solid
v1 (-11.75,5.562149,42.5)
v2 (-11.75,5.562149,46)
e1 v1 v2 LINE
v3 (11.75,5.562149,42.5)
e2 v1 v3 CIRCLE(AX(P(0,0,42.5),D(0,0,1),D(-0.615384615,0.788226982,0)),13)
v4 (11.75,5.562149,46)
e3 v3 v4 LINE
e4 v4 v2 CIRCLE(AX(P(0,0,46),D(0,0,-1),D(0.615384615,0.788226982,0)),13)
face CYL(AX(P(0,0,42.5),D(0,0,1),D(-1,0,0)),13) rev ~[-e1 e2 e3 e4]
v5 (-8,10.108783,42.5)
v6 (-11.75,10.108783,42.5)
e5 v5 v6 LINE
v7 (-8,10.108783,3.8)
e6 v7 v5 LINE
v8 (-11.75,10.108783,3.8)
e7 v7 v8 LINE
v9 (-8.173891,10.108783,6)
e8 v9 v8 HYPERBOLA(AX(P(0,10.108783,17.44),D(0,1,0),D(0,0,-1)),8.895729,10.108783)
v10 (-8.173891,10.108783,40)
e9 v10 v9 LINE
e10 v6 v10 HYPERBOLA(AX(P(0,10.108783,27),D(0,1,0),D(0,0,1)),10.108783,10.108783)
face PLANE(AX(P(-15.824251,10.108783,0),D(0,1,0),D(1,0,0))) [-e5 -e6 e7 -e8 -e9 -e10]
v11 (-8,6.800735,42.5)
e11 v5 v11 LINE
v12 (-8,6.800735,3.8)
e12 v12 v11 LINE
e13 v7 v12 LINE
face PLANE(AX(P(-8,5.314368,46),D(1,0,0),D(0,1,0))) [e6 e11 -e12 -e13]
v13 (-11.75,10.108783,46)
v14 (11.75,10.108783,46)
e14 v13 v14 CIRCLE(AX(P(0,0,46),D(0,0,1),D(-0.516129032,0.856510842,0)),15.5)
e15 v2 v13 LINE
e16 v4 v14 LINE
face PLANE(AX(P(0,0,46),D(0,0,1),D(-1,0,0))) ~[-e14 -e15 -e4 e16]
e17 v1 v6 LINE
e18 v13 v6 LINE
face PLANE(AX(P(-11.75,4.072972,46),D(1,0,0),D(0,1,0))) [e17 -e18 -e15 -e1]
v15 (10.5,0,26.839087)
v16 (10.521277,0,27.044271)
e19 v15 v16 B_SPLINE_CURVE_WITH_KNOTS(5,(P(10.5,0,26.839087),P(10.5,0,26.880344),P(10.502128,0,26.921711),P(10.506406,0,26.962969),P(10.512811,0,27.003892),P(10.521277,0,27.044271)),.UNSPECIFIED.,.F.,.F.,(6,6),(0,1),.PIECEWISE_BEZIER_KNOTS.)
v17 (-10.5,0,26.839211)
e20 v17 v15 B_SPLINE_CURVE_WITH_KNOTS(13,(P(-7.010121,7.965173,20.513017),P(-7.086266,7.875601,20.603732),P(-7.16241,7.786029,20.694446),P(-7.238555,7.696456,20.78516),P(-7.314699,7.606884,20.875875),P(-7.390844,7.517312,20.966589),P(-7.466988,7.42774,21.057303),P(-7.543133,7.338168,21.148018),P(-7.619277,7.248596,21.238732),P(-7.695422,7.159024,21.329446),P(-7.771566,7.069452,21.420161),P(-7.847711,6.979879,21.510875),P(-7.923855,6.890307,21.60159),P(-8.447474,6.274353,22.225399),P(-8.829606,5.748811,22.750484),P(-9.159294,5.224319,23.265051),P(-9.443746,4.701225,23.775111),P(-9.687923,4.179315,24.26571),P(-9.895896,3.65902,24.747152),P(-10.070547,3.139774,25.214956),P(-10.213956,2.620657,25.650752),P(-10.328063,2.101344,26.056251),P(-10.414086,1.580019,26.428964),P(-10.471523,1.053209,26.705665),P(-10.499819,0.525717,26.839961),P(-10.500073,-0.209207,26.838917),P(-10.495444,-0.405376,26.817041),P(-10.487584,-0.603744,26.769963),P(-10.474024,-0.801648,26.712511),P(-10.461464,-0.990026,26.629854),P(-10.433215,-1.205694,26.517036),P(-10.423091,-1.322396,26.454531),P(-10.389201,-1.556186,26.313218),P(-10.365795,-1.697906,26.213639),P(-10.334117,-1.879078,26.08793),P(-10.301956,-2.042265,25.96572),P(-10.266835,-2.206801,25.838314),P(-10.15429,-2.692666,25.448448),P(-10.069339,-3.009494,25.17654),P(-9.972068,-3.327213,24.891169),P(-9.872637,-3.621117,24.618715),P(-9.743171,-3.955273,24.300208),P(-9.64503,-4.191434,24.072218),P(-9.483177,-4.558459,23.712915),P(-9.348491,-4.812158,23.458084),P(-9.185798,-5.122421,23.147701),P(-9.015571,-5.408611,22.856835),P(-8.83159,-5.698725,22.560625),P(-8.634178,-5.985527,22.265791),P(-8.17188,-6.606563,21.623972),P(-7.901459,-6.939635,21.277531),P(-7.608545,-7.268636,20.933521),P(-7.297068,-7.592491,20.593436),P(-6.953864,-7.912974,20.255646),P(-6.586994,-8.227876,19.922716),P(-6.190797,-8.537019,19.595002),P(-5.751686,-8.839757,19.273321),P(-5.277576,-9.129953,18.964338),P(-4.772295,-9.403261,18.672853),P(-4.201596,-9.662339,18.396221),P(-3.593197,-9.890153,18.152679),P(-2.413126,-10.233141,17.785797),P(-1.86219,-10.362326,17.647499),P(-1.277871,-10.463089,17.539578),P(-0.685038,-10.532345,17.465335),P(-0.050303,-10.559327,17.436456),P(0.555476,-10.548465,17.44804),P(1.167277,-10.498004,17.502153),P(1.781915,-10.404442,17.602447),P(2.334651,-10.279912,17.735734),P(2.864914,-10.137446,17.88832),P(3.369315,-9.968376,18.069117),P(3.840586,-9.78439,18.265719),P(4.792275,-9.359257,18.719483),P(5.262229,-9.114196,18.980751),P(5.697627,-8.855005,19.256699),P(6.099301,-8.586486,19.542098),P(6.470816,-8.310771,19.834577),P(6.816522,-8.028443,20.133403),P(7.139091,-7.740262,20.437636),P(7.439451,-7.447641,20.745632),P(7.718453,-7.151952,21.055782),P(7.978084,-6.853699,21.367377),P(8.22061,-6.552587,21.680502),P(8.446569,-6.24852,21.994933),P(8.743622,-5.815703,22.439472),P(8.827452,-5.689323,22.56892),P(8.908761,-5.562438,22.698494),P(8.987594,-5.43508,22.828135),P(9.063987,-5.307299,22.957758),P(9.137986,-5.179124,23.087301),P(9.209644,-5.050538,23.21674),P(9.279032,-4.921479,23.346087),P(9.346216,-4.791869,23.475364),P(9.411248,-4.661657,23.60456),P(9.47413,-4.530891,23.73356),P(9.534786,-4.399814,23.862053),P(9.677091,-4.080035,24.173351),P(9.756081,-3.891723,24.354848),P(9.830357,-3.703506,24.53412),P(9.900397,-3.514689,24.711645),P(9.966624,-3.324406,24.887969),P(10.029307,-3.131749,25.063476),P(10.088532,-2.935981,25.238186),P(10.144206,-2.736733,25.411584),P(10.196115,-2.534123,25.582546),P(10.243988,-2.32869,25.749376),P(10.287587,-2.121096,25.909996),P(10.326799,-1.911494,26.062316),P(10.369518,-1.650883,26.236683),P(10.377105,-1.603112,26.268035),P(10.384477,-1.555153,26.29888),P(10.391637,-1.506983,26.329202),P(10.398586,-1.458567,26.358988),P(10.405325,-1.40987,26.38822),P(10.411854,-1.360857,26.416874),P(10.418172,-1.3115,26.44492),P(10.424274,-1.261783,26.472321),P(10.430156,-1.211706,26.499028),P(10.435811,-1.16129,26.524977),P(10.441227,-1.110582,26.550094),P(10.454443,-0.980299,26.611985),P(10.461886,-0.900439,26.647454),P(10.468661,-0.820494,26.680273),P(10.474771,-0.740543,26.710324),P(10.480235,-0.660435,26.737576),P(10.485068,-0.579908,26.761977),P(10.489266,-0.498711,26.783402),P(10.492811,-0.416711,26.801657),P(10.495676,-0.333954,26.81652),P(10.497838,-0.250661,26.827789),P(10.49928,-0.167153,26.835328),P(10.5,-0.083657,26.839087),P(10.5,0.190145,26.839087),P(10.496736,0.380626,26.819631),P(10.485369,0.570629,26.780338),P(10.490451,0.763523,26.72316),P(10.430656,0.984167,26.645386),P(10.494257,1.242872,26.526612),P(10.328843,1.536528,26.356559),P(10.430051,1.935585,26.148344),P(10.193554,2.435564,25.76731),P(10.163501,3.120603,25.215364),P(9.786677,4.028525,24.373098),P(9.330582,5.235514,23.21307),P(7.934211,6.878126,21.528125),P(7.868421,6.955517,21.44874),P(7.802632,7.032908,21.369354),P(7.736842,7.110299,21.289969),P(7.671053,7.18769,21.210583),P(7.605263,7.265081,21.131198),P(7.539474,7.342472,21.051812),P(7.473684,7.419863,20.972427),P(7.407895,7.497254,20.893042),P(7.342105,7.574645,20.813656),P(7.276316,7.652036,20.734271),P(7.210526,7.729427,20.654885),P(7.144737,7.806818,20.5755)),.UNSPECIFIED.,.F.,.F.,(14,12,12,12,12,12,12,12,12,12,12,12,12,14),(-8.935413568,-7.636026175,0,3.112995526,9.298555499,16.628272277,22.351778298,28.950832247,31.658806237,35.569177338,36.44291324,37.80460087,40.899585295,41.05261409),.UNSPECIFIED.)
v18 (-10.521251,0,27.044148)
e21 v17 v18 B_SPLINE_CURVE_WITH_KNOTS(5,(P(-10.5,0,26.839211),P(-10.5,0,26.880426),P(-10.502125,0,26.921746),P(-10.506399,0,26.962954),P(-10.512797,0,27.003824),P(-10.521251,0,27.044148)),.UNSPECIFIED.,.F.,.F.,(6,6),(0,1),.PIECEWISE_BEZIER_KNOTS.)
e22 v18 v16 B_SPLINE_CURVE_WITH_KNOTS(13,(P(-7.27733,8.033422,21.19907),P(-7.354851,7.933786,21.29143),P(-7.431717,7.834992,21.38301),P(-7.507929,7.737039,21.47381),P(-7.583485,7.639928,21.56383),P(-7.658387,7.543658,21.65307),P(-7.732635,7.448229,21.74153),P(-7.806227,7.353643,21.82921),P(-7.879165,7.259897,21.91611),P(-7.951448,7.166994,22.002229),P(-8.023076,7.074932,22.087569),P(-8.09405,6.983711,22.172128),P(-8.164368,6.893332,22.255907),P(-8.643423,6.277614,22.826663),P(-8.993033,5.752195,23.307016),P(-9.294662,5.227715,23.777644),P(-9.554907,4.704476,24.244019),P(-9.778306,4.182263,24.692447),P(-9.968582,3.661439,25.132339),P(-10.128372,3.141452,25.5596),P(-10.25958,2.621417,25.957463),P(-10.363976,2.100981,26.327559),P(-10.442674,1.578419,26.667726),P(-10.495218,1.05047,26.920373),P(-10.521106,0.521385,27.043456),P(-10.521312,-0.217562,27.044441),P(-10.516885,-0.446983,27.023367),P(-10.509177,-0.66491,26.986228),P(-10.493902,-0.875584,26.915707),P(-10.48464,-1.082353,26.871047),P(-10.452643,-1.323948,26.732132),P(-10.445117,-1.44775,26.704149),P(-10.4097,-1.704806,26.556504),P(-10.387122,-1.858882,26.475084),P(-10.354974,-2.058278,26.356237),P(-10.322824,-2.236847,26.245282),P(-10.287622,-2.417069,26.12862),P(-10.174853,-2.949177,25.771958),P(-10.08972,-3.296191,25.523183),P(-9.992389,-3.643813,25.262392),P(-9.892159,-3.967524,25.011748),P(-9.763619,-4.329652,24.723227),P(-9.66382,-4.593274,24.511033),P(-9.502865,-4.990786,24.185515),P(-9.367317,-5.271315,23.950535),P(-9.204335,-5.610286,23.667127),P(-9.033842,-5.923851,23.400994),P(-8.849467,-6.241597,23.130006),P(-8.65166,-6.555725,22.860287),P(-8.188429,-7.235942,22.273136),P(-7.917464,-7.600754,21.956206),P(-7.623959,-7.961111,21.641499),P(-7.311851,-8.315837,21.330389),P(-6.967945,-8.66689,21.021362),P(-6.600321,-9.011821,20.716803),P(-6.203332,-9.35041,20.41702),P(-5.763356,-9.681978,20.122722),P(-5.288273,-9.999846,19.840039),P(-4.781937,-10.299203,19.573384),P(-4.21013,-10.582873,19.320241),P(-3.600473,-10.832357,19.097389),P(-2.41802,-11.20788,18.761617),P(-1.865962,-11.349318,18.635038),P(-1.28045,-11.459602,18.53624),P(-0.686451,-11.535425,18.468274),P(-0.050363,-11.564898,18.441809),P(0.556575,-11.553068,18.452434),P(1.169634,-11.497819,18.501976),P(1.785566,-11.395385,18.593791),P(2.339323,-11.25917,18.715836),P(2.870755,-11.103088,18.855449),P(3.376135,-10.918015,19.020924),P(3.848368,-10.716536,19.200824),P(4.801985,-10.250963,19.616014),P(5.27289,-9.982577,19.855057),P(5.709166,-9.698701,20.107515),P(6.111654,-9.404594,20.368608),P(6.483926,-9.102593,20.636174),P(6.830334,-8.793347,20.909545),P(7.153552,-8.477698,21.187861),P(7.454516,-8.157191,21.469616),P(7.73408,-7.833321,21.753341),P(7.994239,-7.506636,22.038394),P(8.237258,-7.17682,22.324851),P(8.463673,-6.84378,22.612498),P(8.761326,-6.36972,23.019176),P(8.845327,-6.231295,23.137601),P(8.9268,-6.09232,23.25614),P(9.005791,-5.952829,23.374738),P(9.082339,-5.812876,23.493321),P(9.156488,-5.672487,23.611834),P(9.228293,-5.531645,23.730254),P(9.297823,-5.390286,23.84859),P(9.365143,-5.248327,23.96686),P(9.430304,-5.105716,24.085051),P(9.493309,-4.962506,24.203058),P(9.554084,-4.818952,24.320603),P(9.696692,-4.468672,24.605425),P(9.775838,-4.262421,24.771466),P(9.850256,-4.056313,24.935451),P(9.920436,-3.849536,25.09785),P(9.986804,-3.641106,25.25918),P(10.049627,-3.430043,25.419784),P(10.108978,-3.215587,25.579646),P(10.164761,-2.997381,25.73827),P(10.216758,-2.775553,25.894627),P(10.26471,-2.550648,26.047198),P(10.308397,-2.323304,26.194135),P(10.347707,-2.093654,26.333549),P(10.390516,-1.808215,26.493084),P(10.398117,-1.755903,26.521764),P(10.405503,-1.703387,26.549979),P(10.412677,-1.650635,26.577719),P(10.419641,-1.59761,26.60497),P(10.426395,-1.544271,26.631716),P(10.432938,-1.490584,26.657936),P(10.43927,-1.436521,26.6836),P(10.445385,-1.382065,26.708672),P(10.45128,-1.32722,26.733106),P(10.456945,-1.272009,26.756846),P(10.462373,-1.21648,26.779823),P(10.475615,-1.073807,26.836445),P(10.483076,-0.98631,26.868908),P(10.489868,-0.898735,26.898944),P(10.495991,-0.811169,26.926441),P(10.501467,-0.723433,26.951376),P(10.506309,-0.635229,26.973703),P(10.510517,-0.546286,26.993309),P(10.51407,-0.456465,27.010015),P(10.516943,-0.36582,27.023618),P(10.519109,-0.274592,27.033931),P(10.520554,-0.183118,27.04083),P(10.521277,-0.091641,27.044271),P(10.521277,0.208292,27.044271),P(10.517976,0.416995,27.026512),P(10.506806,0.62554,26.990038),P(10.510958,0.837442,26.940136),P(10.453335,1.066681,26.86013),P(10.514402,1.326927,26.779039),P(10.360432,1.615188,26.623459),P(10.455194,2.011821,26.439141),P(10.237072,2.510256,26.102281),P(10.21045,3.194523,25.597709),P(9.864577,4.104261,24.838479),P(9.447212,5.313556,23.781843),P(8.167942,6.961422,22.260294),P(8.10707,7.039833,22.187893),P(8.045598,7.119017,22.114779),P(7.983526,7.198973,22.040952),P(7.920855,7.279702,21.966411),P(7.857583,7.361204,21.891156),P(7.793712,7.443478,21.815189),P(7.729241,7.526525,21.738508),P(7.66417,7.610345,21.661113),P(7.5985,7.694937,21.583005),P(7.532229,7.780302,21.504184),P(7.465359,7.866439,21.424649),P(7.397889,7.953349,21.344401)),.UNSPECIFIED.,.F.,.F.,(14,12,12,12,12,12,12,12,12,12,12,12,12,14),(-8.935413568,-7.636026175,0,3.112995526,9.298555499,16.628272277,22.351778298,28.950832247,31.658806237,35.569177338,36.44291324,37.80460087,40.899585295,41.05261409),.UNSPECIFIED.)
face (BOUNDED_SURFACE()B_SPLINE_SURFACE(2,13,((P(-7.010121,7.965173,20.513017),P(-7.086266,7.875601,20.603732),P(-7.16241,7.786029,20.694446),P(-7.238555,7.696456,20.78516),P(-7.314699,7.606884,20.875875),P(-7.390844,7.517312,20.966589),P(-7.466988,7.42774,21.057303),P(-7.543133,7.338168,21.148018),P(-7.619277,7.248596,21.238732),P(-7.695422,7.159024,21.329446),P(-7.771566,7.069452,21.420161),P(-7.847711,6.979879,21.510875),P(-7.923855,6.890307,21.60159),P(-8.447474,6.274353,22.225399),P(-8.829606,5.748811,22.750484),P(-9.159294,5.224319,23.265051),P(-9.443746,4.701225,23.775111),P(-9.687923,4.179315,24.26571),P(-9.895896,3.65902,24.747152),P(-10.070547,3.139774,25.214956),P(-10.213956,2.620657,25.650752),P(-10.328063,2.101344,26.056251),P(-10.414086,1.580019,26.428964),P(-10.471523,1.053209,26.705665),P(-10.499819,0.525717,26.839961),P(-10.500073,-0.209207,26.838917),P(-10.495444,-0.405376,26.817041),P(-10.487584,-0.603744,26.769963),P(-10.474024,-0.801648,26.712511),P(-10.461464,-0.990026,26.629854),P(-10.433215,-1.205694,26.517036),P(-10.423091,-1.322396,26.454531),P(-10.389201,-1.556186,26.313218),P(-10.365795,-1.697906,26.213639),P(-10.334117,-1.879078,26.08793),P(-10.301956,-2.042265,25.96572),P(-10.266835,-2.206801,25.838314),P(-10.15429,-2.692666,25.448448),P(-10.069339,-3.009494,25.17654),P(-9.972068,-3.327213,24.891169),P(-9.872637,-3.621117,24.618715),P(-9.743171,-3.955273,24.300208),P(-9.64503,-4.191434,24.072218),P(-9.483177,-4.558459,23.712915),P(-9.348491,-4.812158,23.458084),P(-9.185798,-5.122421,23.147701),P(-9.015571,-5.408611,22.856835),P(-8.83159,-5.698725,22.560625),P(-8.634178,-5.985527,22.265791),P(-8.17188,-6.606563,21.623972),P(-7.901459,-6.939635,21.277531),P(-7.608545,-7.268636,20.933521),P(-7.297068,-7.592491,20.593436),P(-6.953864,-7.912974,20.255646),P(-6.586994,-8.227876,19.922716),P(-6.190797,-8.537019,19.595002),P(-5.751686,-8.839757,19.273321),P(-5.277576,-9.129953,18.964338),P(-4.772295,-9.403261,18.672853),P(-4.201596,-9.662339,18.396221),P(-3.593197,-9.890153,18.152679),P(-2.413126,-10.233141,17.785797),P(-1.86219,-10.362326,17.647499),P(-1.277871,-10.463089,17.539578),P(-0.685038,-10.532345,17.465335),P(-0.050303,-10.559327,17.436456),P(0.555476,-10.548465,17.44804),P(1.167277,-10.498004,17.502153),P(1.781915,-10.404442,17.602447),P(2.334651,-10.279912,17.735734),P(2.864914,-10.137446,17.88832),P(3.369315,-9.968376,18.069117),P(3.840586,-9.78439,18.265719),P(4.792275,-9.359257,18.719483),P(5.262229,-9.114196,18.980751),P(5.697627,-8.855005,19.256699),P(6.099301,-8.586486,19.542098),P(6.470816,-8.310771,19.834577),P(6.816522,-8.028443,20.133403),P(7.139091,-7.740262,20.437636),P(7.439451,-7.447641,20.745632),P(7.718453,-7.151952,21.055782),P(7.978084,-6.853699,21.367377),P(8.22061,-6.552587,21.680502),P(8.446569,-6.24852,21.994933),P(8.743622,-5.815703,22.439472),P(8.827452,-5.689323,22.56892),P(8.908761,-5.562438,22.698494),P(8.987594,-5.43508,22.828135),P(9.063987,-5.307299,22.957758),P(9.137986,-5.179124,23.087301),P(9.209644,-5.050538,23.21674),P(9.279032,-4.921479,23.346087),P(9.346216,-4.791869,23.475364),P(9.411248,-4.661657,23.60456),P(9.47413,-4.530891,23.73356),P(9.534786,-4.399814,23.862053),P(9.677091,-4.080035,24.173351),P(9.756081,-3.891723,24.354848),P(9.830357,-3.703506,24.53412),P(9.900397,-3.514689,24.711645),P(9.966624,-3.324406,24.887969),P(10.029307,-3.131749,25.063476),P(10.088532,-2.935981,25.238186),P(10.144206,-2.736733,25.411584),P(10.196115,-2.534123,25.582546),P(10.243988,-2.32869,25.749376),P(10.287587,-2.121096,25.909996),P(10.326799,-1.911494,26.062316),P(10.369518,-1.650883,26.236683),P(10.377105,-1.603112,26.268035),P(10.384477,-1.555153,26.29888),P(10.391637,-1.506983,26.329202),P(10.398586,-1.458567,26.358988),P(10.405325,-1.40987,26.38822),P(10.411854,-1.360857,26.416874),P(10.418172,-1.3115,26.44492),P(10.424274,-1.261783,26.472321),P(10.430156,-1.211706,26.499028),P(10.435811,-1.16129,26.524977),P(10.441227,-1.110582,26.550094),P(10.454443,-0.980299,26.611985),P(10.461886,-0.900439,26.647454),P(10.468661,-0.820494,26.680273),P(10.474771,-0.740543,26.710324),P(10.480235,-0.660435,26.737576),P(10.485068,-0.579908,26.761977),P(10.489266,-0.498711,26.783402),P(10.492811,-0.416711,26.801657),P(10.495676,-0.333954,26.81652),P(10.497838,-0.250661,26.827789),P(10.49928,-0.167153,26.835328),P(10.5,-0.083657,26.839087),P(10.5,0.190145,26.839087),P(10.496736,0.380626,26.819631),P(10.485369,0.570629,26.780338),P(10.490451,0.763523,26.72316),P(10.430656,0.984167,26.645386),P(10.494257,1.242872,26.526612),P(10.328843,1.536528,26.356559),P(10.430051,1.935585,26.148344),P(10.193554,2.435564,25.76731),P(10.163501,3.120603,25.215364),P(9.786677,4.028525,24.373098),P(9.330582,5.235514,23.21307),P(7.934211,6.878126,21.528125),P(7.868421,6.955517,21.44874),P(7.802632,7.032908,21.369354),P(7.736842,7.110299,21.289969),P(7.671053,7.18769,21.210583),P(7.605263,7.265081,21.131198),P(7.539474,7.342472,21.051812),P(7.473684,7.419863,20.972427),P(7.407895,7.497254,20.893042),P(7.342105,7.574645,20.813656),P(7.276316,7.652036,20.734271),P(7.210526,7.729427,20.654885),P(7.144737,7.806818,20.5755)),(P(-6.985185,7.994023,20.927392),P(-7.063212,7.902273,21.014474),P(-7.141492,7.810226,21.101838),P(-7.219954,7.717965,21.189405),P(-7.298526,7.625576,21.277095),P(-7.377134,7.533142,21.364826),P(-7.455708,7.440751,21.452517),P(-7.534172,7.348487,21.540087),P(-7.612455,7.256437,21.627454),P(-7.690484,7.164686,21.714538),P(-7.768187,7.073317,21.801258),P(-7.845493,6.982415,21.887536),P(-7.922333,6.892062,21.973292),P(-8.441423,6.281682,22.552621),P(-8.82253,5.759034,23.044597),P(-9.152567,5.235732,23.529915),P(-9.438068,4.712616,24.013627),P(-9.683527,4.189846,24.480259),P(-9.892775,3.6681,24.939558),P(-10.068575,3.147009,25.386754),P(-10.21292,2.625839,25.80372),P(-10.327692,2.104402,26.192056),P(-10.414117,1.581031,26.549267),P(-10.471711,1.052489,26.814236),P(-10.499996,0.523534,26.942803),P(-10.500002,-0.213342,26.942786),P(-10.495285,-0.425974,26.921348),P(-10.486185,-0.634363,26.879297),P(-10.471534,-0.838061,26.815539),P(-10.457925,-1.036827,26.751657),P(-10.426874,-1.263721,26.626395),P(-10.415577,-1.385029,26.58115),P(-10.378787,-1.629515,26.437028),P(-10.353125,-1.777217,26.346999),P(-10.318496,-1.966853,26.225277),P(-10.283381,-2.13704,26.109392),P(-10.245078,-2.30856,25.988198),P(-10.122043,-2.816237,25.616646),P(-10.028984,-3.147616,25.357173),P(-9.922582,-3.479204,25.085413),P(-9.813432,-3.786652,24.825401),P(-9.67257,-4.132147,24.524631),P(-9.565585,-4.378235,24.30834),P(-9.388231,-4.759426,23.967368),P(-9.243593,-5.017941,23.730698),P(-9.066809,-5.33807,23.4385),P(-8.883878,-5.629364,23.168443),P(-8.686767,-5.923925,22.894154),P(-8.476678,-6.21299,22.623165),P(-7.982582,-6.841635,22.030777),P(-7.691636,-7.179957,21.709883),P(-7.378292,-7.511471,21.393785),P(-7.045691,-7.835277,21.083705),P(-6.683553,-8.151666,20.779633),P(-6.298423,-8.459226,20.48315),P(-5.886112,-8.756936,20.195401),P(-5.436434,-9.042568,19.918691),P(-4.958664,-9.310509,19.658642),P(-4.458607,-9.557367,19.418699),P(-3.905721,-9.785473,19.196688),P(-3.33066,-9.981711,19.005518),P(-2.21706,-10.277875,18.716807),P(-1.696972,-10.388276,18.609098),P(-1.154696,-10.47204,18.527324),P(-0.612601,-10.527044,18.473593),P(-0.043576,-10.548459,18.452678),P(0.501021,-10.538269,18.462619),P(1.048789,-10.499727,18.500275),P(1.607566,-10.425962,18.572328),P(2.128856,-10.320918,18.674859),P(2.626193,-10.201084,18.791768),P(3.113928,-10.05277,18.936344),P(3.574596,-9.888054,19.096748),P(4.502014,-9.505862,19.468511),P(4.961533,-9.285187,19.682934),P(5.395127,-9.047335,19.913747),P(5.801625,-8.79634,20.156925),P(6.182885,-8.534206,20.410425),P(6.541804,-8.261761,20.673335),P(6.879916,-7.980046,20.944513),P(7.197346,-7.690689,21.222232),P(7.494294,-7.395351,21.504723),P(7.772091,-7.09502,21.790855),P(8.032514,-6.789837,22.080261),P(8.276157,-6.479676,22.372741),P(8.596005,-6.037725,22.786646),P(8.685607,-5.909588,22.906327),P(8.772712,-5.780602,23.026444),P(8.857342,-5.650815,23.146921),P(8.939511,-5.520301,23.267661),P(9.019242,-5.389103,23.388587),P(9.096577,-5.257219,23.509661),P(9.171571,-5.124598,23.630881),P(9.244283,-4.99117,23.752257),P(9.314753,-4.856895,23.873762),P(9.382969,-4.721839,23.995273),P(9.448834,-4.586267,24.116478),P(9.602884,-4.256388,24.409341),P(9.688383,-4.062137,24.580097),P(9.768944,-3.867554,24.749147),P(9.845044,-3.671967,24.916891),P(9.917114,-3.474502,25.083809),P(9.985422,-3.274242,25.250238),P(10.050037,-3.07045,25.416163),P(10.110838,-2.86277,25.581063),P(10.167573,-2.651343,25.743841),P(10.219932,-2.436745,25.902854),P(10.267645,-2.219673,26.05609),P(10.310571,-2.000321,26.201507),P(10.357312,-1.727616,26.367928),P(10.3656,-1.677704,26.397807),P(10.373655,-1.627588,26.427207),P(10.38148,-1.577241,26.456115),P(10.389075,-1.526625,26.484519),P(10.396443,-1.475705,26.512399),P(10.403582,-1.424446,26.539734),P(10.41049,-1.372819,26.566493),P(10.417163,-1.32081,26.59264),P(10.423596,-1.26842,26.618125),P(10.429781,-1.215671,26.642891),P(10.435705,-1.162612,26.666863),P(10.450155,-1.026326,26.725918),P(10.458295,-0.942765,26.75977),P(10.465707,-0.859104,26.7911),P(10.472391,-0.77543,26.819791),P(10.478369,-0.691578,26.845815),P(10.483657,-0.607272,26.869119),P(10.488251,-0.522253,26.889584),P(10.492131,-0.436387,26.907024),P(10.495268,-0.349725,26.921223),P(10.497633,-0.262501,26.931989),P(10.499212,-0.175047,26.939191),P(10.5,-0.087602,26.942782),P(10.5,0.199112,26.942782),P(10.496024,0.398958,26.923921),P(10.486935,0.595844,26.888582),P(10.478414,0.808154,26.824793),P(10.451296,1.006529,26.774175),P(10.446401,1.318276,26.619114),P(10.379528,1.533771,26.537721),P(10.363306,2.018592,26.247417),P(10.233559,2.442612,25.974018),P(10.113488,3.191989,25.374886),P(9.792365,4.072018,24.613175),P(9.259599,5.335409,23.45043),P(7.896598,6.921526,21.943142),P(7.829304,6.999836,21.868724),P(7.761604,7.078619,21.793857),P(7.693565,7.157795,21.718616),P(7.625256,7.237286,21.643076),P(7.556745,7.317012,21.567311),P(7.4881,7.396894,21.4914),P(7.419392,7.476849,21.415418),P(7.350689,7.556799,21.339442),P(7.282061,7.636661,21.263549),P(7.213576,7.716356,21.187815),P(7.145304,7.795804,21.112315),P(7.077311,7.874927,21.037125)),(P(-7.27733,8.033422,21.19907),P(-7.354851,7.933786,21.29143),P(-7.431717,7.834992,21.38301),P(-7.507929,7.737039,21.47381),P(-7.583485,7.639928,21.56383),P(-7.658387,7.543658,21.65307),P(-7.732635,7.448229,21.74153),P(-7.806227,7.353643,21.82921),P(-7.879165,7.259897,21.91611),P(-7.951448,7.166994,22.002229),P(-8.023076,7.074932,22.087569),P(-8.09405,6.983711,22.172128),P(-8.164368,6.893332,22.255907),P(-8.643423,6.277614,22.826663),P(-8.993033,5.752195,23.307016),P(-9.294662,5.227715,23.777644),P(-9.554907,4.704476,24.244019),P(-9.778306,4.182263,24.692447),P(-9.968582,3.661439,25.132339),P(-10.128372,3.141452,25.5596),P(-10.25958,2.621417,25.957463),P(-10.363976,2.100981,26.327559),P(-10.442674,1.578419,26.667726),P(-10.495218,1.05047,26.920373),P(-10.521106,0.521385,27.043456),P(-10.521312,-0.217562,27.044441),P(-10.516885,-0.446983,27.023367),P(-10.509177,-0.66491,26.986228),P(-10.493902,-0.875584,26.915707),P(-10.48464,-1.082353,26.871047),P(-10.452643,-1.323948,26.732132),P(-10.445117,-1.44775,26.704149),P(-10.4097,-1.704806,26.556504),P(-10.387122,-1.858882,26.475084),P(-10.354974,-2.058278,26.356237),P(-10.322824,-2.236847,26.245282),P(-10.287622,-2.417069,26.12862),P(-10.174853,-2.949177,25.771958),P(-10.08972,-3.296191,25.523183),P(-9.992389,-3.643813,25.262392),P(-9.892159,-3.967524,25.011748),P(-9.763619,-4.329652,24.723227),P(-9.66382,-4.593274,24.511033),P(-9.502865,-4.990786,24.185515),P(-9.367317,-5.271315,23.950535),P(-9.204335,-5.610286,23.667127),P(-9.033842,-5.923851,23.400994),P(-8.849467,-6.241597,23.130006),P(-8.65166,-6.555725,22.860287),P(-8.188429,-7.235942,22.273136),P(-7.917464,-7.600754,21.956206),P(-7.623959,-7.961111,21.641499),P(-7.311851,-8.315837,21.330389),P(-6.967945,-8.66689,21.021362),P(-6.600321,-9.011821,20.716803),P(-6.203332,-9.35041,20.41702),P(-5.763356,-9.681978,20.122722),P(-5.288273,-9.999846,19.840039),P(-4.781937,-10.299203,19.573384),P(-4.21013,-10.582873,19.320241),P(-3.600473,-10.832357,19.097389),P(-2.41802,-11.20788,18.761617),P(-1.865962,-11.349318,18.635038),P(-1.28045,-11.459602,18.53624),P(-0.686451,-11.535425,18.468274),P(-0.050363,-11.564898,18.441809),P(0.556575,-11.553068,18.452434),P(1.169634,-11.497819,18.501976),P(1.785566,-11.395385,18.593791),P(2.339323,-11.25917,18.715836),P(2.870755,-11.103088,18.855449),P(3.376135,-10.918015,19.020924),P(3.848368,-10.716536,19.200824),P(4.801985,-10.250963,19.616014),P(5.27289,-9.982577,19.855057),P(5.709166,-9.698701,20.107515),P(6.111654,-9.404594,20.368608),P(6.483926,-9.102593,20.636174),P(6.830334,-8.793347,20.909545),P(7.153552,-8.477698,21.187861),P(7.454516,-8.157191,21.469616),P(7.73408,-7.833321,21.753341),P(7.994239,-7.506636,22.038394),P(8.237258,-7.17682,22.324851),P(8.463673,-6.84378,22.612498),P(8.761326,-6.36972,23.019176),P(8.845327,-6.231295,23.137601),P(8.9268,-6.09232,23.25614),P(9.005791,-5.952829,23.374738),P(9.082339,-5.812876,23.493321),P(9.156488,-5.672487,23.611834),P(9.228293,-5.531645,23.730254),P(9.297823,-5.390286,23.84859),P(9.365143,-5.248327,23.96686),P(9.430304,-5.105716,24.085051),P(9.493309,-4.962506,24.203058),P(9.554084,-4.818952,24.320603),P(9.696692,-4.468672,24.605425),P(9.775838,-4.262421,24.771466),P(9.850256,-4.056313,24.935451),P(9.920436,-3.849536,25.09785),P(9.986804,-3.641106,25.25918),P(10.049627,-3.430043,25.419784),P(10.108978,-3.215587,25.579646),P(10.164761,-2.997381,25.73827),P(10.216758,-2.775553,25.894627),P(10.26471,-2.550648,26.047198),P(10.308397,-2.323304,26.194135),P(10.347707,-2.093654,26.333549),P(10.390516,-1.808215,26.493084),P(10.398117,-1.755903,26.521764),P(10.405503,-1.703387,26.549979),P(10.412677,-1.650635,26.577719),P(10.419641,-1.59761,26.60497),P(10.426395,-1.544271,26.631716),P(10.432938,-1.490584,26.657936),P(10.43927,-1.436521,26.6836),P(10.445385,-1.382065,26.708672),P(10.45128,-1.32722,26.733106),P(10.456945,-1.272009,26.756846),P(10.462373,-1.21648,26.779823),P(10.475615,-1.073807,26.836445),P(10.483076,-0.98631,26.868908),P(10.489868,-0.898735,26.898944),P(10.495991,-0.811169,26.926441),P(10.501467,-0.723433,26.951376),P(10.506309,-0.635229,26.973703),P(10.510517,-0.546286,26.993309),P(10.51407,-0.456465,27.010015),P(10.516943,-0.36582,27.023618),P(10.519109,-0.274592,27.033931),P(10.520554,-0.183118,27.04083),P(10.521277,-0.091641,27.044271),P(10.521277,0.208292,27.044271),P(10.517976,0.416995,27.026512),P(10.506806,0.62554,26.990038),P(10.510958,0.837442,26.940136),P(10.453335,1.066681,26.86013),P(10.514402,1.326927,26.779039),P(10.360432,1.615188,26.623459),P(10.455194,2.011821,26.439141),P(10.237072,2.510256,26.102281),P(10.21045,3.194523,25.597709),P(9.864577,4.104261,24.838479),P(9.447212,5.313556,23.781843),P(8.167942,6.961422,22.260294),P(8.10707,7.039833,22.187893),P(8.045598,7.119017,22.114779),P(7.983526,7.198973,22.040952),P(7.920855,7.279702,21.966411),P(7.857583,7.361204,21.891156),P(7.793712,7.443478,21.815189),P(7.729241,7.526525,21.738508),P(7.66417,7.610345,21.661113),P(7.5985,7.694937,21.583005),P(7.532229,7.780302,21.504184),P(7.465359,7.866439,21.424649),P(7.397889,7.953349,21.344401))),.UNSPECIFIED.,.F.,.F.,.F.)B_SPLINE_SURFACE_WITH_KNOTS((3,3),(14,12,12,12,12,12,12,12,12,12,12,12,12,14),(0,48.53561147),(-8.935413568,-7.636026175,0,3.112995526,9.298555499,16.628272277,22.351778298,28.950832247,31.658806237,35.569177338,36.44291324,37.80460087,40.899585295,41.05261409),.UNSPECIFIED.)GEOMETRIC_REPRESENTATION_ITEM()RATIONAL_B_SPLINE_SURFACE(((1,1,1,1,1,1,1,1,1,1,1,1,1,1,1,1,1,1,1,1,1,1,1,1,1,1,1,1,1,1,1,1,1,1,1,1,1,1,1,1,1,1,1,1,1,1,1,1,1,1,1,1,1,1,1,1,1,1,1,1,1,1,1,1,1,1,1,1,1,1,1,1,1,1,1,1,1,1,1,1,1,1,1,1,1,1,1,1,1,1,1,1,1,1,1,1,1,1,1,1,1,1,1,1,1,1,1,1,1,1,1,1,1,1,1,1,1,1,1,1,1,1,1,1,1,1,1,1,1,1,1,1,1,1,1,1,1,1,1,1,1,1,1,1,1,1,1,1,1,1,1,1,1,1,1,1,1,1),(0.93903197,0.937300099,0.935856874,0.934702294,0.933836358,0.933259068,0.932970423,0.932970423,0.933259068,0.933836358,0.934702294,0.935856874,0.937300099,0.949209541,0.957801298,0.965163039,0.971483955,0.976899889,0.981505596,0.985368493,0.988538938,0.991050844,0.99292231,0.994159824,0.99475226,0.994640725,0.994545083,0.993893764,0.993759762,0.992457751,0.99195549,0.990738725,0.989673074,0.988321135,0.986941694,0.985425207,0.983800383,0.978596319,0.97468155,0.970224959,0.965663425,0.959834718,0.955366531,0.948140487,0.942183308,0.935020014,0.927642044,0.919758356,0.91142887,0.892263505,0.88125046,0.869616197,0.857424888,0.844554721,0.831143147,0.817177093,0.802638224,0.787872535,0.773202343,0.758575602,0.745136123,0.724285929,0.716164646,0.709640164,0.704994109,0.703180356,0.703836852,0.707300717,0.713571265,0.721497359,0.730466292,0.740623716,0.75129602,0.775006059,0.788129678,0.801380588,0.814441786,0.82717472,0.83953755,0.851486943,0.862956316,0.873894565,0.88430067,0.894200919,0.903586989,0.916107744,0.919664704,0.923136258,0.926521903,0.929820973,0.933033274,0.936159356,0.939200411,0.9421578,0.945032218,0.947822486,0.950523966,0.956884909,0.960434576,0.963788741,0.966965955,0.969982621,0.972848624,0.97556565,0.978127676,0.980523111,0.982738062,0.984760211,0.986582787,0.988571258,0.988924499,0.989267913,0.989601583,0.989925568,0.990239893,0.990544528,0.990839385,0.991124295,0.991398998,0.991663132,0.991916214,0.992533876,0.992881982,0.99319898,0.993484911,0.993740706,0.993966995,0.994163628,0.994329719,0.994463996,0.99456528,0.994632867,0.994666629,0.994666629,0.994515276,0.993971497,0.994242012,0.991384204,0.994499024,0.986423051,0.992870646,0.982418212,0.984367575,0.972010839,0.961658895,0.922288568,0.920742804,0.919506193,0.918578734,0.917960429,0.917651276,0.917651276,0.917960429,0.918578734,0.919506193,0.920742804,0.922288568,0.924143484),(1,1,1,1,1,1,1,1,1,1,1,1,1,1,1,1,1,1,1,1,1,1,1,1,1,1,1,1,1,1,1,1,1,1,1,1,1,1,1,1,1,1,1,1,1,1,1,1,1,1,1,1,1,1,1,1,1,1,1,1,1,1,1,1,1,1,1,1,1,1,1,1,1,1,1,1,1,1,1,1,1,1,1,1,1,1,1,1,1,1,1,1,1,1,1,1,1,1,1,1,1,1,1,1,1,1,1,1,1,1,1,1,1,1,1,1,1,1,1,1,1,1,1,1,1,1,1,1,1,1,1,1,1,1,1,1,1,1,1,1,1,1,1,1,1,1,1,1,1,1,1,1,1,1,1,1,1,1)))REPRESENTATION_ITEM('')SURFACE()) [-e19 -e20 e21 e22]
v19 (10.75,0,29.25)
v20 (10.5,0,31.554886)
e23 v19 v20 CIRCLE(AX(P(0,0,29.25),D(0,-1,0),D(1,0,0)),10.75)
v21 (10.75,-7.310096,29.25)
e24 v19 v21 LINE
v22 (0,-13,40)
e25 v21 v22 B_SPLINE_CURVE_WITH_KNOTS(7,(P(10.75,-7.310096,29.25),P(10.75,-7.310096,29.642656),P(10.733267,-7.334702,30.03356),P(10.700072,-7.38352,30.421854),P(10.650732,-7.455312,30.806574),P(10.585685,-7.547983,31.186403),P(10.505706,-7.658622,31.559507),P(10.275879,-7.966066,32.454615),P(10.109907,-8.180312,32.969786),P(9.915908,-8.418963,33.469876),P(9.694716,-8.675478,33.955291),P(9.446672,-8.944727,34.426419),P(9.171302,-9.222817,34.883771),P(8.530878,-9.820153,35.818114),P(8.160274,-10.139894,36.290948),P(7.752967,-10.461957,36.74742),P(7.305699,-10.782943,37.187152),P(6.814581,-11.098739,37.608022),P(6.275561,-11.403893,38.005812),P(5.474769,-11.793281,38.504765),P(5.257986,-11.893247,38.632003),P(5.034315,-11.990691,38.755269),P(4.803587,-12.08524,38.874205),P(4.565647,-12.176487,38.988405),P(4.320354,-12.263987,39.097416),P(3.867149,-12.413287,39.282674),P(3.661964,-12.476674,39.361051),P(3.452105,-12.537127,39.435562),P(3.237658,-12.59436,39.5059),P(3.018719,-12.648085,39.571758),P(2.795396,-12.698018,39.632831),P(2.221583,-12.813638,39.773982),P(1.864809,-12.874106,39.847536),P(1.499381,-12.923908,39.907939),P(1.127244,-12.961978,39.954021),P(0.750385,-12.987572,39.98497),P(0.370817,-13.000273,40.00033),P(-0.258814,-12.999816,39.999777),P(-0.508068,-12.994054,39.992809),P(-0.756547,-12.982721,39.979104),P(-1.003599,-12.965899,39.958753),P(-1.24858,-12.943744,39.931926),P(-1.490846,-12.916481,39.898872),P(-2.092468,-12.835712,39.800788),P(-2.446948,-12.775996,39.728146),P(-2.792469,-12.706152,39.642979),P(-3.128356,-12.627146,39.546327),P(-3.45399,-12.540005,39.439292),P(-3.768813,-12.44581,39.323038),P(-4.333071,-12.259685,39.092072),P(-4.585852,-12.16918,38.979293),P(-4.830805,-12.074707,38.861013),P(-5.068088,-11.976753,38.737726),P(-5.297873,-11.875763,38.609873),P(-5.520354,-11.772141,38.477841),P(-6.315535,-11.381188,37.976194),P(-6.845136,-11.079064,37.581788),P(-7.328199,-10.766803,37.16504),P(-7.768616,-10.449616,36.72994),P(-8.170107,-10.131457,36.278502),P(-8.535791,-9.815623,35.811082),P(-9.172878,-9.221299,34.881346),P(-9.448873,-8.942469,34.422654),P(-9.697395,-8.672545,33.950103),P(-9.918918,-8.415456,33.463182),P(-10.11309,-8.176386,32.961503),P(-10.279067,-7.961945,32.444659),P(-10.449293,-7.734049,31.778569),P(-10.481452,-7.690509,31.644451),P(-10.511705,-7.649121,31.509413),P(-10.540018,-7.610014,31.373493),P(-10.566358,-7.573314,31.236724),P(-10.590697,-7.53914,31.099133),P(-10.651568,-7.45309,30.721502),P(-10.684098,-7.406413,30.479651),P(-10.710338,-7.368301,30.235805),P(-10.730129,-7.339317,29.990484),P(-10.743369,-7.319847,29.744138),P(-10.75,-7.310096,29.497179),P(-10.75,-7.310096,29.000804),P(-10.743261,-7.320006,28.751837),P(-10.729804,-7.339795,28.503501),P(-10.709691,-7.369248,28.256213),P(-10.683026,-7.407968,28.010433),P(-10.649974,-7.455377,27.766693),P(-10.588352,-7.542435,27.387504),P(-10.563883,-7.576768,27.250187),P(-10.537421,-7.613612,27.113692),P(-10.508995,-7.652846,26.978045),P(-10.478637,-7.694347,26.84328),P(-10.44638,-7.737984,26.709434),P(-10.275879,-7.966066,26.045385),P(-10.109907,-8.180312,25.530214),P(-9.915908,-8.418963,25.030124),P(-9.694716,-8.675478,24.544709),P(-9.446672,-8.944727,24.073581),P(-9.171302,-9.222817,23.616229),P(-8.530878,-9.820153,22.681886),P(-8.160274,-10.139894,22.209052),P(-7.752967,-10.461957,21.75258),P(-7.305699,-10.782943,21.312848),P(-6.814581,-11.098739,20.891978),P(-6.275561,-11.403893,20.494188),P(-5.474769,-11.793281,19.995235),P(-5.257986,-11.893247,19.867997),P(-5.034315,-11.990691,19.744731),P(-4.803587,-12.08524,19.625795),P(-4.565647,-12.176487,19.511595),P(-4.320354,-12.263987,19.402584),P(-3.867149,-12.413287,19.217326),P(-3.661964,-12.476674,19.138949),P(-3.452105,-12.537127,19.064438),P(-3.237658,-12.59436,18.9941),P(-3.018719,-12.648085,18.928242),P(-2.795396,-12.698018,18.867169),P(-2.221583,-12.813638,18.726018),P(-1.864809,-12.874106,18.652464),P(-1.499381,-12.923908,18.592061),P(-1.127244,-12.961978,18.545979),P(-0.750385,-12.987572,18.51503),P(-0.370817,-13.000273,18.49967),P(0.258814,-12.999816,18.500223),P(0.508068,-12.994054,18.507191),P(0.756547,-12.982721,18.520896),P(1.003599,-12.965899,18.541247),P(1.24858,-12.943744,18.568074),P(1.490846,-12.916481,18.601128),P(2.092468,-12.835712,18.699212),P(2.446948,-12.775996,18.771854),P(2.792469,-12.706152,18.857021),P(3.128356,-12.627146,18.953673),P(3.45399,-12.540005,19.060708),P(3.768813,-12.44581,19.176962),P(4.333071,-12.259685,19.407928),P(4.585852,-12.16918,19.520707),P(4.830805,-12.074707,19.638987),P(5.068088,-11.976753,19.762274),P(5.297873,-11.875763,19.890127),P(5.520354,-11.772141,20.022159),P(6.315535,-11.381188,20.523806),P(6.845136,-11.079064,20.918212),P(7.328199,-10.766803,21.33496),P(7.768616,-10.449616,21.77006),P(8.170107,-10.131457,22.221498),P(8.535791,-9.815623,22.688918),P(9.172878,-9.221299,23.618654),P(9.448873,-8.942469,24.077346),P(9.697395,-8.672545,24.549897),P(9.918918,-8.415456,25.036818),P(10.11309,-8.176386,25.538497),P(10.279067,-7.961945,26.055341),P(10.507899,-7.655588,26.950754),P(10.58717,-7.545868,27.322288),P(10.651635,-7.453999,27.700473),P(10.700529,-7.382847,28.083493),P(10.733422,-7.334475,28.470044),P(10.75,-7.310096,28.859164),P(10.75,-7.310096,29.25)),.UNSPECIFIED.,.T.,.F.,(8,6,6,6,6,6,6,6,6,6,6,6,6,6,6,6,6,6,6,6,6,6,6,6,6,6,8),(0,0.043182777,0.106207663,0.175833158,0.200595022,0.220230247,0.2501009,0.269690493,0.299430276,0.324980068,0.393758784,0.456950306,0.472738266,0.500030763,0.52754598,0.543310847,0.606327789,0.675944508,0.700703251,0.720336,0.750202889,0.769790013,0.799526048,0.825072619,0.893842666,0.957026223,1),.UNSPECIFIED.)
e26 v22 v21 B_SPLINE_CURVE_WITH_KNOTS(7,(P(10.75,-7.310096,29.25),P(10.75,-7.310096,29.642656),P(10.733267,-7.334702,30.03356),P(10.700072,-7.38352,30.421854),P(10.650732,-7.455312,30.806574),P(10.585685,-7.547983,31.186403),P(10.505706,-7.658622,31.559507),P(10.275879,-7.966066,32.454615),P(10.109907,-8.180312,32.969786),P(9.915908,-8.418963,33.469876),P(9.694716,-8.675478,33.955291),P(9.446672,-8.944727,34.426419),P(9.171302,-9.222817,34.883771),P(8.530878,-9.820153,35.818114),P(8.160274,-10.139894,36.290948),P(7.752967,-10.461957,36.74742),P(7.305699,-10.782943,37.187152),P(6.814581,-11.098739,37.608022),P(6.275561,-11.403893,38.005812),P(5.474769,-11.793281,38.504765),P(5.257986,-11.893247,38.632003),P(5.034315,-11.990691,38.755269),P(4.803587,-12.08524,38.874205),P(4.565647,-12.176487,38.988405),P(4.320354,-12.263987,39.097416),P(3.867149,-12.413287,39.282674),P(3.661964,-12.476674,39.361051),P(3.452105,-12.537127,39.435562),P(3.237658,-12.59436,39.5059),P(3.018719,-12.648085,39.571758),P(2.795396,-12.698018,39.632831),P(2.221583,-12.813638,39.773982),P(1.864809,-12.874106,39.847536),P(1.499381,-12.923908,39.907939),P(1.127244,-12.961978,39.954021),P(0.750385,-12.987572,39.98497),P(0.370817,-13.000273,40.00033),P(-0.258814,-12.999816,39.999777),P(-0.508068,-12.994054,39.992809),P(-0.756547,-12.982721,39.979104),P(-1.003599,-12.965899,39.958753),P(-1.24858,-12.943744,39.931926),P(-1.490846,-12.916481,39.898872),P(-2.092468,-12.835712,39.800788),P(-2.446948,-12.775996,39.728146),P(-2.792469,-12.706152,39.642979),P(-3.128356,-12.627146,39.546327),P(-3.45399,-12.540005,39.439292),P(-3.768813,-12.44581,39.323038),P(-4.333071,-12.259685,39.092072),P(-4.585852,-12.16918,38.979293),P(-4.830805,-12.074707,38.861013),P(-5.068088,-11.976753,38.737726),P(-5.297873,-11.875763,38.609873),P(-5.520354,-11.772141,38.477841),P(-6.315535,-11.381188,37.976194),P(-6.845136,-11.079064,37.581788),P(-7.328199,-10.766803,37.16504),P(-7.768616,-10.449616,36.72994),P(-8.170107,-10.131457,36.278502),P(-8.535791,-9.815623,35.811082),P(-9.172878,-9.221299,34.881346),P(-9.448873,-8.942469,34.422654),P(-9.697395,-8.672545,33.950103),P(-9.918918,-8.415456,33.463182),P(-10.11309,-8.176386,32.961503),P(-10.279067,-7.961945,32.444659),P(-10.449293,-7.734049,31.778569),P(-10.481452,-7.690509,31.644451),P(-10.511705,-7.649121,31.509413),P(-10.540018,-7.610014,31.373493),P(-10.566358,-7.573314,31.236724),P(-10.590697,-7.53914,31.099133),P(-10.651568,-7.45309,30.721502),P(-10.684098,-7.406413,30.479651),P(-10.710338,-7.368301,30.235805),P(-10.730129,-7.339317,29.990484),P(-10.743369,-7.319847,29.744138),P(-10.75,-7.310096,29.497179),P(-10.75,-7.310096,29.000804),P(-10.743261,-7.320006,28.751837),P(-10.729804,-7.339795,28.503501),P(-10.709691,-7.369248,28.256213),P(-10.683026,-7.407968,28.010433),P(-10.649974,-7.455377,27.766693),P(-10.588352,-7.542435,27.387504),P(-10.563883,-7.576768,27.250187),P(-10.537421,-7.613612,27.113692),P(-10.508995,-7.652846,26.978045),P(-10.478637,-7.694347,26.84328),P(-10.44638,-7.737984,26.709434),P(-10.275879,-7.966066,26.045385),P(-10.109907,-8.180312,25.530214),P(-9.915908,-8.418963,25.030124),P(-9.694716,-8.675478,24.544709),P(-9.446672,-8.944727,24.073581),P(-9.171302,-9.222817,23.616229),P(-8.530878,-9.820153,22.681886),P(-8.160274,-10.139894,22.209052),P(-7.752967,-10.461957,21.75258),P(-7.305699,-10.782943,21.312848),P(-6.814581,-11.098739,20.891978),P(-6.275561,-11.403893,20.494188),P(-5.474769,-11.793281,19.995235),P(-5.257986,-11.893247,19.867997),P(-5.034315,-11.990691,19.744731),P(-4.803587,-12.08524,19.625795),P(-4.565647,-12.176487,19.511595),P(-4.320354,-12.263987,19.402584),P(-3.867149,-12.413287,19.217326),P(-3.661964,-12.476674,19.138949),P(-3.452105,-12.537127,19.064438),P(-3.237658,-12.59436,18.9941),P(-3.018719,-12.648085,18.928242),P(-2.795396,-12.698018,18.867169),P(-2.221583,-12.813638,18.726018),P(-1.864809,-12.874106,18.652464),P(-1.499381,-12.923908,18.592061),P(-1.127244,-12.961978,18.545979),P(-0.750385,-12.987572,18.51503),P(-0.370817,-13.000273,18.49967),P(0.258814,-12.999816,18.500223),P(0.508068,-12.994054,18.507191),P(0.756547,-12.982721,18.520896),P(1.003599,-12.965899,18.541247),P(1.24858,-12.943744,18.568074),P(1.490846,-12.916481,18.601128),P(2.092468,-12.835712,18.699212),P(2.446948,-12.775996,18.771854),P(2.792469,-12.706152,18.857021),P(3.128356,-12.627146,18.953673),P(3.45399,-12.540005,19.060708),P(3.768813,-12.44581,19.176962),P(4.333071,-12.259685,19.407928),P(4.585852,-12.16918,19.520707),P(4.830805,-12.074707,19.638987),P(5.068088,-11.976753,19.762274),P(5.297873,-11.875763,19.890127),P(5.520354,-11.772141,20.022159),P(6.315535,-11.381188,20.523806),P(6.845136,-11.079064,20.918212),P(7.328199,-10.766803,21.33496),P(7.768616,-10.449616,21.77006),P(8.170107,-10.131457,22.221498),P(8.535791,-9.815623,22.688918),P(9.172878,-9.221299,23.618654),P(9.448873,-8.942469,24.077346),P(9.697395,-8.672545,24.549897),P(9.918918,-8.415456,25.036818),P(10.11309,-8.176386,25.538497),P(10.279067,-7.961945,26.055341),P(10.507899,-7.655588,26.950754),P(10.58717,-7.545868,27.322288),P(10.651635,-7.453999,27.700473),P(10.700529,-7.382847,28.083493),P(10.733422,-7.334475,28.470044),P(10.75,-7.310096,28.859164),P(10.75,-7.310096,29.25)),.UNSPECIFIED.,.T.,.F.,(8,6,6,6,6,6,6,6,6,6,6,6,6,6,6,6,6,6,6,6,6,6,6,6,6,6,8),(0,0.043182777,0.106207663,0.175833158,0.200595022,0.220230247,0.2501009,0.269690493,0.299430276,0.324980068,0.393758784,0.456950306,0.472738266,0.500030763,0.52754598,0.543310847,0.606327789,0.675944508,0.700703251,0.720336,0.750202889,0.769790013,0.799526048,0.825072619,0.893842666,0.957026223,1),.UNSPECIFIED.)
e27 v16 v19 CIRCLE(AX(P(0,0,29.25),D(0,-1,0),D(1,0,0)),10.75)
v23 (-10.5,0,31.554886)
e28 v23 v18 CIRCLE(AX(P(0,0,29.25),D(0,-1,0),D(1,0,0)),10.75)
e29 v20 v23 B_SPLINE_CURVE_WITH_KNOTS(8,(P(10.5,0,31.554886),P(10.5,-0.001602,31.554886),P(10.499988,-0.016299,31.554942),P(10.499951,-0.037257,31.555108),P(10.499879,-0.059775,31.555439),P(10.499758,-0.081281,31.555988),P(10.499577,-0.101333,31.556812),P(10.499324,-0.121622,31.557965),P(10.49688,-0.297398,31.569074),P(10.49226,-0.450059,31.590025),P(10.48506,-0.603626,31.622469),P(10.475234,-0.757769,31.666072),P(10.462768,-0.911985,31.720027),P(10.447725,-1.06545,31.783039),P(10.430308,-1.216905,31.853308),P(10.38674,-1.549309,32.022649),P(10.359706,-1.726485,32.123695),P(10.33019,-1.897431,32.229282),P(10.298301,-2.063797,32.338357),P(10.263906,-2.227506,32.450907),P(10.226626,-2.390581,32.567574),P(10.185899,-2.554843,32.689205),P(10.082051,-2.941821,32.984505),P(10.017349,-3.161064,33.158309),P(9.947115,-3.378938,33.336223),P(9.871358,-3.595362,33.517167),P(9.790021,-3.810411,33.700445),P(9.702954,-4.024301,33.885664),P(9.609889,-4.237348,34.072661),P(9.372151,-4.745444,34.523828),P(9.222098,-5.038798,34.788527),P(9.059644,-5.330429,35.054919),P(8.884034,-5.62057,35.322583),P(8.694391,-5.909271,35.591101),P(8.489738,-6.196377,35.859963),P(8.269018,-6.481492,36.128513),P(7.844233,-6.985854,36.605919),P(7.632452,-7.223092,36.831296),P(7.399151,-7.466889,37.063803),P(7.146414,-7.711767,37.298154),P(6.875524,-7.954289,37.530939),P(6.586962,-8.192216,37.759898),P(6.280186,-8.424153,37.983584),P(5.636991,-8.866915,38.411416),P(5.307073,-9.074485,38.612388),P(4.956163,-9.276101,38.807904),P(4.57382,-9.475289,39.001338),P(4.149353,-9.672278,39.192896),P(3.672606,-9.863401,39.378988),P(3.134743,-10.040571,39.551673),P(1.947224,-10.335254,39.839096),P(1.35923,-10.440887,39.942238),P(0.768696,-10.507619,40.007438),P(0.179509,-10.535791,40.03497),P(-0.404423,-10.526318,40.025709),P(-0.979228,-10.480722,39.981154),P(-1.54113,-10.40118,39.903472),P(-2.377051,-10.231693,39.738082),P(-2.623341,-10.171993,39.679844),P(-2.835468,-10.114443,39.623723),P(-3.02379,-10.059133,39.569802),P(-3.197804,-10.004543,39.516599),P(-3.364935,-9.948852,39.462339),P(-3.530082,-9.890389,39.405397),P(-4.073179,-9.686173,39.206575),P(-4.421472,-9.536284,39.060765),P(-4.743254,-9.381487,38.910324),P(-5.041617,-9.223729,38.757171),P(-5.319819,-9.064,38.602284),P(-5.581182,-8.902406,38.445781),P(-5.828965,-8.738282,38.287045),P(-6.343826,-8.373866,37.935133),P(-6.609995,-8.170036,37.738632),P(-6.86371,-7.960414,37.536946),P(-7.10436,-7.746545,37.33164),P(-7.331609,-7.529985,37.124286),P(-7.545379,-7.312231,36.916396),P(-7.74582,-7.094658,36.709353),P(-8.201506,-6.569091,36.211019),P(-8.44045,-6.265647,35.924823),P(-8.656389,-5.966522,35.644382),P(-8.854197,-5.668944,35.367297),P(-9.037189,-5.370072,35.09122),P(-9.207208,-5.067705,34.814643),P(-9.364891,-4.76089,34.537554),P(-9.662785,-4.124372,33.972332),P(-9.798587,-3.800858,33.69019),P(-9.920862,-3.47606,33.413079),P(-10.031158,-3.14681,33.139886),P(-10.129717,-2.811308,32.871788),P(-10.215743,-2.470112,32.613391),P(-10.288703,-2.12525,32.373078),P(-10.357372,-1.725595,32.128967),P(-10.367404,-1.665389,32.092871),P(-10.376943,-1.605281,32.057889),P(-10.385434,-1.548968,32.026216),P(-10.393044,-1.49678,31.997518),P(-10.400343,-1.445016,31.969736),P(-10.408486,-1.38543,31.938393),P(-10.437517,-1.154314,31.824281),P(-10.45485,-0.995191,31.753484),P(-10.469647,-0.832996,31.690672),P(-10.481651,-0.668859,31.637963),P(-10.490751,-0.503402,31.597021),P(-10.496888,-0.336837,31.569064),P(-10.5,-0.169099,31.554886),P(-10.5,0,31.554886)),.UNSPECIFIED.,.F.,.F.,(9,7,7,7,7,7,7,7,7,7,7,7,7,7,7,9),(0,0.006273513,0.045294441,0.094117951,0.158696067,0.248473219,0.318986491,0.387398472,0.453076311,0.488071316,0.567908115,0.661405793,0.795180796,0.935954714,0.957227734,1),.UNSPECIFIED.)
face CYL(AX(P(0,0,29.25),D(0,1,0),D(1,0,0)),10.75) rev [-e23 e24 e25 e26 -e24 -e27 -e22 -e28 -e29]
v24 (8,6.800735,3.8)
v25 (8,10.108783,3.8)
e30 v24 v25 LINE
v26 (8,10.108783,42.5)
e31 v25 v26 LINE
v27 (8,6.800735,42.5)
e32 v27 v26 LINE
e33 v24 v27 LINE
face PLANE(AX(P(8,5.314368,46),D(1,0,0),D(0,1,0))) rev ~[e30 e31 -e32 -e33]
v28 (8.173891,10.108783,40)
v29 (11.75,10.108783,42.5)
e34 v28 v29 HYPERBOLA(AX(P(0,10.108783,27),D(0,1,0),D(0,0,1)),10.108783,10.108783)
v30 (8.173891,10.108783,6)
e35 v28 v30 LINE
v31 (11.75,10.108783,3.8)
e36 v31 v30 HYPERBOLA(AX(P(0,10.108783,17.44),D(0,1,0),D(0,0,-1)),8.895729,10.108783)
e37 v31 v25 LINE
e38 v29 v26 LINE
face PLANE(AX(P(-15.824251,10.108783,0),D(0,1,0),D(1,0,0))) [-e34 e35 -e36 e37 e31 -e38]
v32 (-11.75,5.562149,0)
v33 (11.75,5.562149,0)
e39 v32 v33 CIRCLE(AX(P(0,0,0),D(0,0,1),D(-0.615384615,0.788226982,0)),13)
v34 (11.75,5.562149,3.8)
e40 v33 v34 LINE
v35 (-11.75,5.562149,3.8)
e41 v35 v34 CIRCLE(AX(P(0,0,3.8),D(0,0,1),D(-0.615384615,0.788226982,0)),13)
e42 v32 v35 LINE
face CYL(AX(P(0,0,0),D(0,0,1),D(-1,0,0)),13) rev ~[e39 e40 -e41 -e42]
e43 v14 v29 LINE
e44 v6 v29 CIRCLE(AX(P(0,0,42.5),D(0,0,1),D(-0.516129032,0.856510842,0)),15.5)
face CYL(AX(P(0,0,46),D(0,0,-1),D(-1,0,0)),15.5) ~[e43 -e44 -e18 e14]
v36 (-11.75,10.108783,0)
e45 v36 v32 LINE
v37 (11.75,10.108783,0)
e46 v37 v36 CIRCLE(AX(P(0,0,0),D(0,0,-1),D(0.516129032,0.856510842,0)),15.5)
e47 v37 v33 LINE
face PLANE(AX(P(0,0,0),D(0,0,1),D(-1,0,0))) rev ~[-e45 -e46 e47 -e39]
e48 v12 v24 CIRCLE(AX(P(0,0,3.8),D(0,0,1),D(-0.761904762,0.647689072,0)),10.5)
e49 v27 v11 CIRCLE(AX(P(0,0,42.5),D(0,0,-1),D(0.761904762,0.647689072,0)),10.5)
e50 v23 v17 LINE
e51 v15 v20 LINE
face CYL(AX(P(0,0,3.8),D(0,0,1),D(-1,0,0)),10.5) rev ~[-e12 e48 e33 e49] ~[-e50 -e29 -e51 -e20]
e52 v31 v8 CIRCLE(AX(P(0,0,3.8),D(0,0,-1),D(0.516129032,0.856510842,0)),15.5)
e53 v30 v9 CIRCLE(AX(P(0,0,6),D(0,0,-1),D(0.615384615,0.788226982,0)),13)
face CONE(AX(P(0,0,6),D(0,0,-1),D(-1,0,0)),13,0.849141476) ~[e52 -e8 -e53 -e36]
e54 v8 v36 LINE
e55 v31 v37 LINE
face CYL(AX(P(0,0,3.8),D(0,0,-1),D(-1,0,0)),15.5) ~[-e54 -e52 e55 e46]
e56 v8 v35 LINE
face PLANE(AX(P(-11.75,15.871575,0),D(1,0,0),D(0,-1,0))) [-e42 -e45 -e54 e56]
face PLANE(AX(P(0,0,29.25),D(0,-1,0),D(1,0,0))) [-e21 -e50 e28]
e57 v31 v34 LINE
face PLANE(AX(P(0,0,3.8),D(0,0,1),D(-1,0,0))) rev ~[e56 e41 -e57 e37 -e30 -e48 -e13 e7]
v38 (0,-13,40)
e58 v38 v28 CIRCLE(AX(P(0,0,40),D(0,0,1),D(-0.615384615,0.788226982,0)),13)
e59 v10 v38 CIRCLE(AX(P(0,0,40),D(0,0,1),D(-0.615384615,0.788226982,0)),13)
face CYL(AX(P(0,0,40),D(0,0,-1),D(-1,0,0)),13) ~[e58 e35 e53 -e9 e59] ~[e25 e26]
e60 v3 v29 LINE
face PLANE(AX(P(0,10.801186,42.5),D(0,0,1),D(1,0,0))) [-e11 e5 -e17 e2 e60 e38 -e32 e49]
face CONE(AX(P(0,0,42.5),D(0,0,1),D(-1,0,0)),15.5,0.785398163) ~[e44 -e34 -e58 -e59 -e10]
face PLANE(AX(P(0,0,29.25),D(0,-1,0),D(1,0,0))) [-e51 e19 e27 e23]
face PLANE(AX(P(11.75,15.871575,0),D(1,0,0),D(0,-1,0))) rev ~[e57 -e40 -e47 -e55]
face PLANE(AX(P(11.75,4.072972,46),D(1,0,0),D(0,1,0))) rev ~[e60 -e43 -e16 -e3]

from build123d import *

# Parameters (mm, degrees)
F2_W      = 16
F2_H      = 12.7785220167
F3_DEPTH  = 46.001
F4_W      = 23.5
F4_H      = 13.4564294844
F5_DEPTH  = 3.5
F6_W      = 23.5
F6_H      = 13.0310004231
F7_DEPTH  = 3.8
F8_R      = 10.75
F9_DEPTH  = 25
F11_W     = 31.7701289256
F11_H     = 9.9966360929
F12_DEPTH = 46.001
F14_R     = 1


with BuildPart() as f1:
    # F0 (on Front) → F1 (revolve)
    with BuildSketch(Plane.XZ):
        Polygon((-15.5, 0), (-13, 0), (-13, 3.8), (-10.5, 3.8), (-10.5, 42.5), (-13, 42.5), (-13, 46), (-15.5, 46), (-15.5, 42.5), (-13, 40), (-13, 6), (-15.5, 3.8), align=None)
    revolve(axis=Axis((0, 0, 24.8965322971), (0, 0, 1)))

    # F2 (on face) → F3 (cut, through all)
    with BuildSketch(Plane.XY.offset(46)):
        with Locations((0, 11.7036290467)):
            Rectangle(F2_W, F2_H)
    extrude(amount=-F3_DEPTH, mode=Mode.SUBTRACT)

    # F4 (on face) → F5 (cut, through all)
    with BuildSketch(Plane.XY.offset(46)):
        with Locations((0, 10.8011863194)):
            Rectangle(F4_W, F4_H)
    extrude(amount=-F5_DEPTH, mode=Mode.SUBTRACT)

    # F6 (on face) → F7 (cut, through all)
    with BuildSketch(Plane(origin=(0, 0, 0), x_dir=(1, 0, 0), z_dir=(0, 0, -1))):
        with Locations((0, -9.3560743844)):
            Rectangle(F6_W, F6_H)
    extrude(amount=-F7_DEPTH, mode=Mode.SUBTRACT)

    # F8 (on Front) → F9 (cut)
    with BuildSketch(Plane.XZ):
        with Locations((0, 29.25)):
            Circle(F8_R)
    extrude(amount=F9_DEPTH, mode=Mode.SUBTRACT)

    # F11 (on Top) → F12 (cut, through all)
    with BuildSketch(Plane.XY):
        with Locations((0.0608135015, 15.107101356)):
            Rectangle(F11_W, F11_H)
    extrude(amount=F12_DEPTH, mode=Mode.SUBTRACT)

    # F14
    f14_edges = [f1.edges().sort_by_distance(p)[0] for p in [
        (0.039521, -10.499926, 18.500073),
    ]]
    fillet(f14_edges, radius=F14_R)


solid = f1.part
